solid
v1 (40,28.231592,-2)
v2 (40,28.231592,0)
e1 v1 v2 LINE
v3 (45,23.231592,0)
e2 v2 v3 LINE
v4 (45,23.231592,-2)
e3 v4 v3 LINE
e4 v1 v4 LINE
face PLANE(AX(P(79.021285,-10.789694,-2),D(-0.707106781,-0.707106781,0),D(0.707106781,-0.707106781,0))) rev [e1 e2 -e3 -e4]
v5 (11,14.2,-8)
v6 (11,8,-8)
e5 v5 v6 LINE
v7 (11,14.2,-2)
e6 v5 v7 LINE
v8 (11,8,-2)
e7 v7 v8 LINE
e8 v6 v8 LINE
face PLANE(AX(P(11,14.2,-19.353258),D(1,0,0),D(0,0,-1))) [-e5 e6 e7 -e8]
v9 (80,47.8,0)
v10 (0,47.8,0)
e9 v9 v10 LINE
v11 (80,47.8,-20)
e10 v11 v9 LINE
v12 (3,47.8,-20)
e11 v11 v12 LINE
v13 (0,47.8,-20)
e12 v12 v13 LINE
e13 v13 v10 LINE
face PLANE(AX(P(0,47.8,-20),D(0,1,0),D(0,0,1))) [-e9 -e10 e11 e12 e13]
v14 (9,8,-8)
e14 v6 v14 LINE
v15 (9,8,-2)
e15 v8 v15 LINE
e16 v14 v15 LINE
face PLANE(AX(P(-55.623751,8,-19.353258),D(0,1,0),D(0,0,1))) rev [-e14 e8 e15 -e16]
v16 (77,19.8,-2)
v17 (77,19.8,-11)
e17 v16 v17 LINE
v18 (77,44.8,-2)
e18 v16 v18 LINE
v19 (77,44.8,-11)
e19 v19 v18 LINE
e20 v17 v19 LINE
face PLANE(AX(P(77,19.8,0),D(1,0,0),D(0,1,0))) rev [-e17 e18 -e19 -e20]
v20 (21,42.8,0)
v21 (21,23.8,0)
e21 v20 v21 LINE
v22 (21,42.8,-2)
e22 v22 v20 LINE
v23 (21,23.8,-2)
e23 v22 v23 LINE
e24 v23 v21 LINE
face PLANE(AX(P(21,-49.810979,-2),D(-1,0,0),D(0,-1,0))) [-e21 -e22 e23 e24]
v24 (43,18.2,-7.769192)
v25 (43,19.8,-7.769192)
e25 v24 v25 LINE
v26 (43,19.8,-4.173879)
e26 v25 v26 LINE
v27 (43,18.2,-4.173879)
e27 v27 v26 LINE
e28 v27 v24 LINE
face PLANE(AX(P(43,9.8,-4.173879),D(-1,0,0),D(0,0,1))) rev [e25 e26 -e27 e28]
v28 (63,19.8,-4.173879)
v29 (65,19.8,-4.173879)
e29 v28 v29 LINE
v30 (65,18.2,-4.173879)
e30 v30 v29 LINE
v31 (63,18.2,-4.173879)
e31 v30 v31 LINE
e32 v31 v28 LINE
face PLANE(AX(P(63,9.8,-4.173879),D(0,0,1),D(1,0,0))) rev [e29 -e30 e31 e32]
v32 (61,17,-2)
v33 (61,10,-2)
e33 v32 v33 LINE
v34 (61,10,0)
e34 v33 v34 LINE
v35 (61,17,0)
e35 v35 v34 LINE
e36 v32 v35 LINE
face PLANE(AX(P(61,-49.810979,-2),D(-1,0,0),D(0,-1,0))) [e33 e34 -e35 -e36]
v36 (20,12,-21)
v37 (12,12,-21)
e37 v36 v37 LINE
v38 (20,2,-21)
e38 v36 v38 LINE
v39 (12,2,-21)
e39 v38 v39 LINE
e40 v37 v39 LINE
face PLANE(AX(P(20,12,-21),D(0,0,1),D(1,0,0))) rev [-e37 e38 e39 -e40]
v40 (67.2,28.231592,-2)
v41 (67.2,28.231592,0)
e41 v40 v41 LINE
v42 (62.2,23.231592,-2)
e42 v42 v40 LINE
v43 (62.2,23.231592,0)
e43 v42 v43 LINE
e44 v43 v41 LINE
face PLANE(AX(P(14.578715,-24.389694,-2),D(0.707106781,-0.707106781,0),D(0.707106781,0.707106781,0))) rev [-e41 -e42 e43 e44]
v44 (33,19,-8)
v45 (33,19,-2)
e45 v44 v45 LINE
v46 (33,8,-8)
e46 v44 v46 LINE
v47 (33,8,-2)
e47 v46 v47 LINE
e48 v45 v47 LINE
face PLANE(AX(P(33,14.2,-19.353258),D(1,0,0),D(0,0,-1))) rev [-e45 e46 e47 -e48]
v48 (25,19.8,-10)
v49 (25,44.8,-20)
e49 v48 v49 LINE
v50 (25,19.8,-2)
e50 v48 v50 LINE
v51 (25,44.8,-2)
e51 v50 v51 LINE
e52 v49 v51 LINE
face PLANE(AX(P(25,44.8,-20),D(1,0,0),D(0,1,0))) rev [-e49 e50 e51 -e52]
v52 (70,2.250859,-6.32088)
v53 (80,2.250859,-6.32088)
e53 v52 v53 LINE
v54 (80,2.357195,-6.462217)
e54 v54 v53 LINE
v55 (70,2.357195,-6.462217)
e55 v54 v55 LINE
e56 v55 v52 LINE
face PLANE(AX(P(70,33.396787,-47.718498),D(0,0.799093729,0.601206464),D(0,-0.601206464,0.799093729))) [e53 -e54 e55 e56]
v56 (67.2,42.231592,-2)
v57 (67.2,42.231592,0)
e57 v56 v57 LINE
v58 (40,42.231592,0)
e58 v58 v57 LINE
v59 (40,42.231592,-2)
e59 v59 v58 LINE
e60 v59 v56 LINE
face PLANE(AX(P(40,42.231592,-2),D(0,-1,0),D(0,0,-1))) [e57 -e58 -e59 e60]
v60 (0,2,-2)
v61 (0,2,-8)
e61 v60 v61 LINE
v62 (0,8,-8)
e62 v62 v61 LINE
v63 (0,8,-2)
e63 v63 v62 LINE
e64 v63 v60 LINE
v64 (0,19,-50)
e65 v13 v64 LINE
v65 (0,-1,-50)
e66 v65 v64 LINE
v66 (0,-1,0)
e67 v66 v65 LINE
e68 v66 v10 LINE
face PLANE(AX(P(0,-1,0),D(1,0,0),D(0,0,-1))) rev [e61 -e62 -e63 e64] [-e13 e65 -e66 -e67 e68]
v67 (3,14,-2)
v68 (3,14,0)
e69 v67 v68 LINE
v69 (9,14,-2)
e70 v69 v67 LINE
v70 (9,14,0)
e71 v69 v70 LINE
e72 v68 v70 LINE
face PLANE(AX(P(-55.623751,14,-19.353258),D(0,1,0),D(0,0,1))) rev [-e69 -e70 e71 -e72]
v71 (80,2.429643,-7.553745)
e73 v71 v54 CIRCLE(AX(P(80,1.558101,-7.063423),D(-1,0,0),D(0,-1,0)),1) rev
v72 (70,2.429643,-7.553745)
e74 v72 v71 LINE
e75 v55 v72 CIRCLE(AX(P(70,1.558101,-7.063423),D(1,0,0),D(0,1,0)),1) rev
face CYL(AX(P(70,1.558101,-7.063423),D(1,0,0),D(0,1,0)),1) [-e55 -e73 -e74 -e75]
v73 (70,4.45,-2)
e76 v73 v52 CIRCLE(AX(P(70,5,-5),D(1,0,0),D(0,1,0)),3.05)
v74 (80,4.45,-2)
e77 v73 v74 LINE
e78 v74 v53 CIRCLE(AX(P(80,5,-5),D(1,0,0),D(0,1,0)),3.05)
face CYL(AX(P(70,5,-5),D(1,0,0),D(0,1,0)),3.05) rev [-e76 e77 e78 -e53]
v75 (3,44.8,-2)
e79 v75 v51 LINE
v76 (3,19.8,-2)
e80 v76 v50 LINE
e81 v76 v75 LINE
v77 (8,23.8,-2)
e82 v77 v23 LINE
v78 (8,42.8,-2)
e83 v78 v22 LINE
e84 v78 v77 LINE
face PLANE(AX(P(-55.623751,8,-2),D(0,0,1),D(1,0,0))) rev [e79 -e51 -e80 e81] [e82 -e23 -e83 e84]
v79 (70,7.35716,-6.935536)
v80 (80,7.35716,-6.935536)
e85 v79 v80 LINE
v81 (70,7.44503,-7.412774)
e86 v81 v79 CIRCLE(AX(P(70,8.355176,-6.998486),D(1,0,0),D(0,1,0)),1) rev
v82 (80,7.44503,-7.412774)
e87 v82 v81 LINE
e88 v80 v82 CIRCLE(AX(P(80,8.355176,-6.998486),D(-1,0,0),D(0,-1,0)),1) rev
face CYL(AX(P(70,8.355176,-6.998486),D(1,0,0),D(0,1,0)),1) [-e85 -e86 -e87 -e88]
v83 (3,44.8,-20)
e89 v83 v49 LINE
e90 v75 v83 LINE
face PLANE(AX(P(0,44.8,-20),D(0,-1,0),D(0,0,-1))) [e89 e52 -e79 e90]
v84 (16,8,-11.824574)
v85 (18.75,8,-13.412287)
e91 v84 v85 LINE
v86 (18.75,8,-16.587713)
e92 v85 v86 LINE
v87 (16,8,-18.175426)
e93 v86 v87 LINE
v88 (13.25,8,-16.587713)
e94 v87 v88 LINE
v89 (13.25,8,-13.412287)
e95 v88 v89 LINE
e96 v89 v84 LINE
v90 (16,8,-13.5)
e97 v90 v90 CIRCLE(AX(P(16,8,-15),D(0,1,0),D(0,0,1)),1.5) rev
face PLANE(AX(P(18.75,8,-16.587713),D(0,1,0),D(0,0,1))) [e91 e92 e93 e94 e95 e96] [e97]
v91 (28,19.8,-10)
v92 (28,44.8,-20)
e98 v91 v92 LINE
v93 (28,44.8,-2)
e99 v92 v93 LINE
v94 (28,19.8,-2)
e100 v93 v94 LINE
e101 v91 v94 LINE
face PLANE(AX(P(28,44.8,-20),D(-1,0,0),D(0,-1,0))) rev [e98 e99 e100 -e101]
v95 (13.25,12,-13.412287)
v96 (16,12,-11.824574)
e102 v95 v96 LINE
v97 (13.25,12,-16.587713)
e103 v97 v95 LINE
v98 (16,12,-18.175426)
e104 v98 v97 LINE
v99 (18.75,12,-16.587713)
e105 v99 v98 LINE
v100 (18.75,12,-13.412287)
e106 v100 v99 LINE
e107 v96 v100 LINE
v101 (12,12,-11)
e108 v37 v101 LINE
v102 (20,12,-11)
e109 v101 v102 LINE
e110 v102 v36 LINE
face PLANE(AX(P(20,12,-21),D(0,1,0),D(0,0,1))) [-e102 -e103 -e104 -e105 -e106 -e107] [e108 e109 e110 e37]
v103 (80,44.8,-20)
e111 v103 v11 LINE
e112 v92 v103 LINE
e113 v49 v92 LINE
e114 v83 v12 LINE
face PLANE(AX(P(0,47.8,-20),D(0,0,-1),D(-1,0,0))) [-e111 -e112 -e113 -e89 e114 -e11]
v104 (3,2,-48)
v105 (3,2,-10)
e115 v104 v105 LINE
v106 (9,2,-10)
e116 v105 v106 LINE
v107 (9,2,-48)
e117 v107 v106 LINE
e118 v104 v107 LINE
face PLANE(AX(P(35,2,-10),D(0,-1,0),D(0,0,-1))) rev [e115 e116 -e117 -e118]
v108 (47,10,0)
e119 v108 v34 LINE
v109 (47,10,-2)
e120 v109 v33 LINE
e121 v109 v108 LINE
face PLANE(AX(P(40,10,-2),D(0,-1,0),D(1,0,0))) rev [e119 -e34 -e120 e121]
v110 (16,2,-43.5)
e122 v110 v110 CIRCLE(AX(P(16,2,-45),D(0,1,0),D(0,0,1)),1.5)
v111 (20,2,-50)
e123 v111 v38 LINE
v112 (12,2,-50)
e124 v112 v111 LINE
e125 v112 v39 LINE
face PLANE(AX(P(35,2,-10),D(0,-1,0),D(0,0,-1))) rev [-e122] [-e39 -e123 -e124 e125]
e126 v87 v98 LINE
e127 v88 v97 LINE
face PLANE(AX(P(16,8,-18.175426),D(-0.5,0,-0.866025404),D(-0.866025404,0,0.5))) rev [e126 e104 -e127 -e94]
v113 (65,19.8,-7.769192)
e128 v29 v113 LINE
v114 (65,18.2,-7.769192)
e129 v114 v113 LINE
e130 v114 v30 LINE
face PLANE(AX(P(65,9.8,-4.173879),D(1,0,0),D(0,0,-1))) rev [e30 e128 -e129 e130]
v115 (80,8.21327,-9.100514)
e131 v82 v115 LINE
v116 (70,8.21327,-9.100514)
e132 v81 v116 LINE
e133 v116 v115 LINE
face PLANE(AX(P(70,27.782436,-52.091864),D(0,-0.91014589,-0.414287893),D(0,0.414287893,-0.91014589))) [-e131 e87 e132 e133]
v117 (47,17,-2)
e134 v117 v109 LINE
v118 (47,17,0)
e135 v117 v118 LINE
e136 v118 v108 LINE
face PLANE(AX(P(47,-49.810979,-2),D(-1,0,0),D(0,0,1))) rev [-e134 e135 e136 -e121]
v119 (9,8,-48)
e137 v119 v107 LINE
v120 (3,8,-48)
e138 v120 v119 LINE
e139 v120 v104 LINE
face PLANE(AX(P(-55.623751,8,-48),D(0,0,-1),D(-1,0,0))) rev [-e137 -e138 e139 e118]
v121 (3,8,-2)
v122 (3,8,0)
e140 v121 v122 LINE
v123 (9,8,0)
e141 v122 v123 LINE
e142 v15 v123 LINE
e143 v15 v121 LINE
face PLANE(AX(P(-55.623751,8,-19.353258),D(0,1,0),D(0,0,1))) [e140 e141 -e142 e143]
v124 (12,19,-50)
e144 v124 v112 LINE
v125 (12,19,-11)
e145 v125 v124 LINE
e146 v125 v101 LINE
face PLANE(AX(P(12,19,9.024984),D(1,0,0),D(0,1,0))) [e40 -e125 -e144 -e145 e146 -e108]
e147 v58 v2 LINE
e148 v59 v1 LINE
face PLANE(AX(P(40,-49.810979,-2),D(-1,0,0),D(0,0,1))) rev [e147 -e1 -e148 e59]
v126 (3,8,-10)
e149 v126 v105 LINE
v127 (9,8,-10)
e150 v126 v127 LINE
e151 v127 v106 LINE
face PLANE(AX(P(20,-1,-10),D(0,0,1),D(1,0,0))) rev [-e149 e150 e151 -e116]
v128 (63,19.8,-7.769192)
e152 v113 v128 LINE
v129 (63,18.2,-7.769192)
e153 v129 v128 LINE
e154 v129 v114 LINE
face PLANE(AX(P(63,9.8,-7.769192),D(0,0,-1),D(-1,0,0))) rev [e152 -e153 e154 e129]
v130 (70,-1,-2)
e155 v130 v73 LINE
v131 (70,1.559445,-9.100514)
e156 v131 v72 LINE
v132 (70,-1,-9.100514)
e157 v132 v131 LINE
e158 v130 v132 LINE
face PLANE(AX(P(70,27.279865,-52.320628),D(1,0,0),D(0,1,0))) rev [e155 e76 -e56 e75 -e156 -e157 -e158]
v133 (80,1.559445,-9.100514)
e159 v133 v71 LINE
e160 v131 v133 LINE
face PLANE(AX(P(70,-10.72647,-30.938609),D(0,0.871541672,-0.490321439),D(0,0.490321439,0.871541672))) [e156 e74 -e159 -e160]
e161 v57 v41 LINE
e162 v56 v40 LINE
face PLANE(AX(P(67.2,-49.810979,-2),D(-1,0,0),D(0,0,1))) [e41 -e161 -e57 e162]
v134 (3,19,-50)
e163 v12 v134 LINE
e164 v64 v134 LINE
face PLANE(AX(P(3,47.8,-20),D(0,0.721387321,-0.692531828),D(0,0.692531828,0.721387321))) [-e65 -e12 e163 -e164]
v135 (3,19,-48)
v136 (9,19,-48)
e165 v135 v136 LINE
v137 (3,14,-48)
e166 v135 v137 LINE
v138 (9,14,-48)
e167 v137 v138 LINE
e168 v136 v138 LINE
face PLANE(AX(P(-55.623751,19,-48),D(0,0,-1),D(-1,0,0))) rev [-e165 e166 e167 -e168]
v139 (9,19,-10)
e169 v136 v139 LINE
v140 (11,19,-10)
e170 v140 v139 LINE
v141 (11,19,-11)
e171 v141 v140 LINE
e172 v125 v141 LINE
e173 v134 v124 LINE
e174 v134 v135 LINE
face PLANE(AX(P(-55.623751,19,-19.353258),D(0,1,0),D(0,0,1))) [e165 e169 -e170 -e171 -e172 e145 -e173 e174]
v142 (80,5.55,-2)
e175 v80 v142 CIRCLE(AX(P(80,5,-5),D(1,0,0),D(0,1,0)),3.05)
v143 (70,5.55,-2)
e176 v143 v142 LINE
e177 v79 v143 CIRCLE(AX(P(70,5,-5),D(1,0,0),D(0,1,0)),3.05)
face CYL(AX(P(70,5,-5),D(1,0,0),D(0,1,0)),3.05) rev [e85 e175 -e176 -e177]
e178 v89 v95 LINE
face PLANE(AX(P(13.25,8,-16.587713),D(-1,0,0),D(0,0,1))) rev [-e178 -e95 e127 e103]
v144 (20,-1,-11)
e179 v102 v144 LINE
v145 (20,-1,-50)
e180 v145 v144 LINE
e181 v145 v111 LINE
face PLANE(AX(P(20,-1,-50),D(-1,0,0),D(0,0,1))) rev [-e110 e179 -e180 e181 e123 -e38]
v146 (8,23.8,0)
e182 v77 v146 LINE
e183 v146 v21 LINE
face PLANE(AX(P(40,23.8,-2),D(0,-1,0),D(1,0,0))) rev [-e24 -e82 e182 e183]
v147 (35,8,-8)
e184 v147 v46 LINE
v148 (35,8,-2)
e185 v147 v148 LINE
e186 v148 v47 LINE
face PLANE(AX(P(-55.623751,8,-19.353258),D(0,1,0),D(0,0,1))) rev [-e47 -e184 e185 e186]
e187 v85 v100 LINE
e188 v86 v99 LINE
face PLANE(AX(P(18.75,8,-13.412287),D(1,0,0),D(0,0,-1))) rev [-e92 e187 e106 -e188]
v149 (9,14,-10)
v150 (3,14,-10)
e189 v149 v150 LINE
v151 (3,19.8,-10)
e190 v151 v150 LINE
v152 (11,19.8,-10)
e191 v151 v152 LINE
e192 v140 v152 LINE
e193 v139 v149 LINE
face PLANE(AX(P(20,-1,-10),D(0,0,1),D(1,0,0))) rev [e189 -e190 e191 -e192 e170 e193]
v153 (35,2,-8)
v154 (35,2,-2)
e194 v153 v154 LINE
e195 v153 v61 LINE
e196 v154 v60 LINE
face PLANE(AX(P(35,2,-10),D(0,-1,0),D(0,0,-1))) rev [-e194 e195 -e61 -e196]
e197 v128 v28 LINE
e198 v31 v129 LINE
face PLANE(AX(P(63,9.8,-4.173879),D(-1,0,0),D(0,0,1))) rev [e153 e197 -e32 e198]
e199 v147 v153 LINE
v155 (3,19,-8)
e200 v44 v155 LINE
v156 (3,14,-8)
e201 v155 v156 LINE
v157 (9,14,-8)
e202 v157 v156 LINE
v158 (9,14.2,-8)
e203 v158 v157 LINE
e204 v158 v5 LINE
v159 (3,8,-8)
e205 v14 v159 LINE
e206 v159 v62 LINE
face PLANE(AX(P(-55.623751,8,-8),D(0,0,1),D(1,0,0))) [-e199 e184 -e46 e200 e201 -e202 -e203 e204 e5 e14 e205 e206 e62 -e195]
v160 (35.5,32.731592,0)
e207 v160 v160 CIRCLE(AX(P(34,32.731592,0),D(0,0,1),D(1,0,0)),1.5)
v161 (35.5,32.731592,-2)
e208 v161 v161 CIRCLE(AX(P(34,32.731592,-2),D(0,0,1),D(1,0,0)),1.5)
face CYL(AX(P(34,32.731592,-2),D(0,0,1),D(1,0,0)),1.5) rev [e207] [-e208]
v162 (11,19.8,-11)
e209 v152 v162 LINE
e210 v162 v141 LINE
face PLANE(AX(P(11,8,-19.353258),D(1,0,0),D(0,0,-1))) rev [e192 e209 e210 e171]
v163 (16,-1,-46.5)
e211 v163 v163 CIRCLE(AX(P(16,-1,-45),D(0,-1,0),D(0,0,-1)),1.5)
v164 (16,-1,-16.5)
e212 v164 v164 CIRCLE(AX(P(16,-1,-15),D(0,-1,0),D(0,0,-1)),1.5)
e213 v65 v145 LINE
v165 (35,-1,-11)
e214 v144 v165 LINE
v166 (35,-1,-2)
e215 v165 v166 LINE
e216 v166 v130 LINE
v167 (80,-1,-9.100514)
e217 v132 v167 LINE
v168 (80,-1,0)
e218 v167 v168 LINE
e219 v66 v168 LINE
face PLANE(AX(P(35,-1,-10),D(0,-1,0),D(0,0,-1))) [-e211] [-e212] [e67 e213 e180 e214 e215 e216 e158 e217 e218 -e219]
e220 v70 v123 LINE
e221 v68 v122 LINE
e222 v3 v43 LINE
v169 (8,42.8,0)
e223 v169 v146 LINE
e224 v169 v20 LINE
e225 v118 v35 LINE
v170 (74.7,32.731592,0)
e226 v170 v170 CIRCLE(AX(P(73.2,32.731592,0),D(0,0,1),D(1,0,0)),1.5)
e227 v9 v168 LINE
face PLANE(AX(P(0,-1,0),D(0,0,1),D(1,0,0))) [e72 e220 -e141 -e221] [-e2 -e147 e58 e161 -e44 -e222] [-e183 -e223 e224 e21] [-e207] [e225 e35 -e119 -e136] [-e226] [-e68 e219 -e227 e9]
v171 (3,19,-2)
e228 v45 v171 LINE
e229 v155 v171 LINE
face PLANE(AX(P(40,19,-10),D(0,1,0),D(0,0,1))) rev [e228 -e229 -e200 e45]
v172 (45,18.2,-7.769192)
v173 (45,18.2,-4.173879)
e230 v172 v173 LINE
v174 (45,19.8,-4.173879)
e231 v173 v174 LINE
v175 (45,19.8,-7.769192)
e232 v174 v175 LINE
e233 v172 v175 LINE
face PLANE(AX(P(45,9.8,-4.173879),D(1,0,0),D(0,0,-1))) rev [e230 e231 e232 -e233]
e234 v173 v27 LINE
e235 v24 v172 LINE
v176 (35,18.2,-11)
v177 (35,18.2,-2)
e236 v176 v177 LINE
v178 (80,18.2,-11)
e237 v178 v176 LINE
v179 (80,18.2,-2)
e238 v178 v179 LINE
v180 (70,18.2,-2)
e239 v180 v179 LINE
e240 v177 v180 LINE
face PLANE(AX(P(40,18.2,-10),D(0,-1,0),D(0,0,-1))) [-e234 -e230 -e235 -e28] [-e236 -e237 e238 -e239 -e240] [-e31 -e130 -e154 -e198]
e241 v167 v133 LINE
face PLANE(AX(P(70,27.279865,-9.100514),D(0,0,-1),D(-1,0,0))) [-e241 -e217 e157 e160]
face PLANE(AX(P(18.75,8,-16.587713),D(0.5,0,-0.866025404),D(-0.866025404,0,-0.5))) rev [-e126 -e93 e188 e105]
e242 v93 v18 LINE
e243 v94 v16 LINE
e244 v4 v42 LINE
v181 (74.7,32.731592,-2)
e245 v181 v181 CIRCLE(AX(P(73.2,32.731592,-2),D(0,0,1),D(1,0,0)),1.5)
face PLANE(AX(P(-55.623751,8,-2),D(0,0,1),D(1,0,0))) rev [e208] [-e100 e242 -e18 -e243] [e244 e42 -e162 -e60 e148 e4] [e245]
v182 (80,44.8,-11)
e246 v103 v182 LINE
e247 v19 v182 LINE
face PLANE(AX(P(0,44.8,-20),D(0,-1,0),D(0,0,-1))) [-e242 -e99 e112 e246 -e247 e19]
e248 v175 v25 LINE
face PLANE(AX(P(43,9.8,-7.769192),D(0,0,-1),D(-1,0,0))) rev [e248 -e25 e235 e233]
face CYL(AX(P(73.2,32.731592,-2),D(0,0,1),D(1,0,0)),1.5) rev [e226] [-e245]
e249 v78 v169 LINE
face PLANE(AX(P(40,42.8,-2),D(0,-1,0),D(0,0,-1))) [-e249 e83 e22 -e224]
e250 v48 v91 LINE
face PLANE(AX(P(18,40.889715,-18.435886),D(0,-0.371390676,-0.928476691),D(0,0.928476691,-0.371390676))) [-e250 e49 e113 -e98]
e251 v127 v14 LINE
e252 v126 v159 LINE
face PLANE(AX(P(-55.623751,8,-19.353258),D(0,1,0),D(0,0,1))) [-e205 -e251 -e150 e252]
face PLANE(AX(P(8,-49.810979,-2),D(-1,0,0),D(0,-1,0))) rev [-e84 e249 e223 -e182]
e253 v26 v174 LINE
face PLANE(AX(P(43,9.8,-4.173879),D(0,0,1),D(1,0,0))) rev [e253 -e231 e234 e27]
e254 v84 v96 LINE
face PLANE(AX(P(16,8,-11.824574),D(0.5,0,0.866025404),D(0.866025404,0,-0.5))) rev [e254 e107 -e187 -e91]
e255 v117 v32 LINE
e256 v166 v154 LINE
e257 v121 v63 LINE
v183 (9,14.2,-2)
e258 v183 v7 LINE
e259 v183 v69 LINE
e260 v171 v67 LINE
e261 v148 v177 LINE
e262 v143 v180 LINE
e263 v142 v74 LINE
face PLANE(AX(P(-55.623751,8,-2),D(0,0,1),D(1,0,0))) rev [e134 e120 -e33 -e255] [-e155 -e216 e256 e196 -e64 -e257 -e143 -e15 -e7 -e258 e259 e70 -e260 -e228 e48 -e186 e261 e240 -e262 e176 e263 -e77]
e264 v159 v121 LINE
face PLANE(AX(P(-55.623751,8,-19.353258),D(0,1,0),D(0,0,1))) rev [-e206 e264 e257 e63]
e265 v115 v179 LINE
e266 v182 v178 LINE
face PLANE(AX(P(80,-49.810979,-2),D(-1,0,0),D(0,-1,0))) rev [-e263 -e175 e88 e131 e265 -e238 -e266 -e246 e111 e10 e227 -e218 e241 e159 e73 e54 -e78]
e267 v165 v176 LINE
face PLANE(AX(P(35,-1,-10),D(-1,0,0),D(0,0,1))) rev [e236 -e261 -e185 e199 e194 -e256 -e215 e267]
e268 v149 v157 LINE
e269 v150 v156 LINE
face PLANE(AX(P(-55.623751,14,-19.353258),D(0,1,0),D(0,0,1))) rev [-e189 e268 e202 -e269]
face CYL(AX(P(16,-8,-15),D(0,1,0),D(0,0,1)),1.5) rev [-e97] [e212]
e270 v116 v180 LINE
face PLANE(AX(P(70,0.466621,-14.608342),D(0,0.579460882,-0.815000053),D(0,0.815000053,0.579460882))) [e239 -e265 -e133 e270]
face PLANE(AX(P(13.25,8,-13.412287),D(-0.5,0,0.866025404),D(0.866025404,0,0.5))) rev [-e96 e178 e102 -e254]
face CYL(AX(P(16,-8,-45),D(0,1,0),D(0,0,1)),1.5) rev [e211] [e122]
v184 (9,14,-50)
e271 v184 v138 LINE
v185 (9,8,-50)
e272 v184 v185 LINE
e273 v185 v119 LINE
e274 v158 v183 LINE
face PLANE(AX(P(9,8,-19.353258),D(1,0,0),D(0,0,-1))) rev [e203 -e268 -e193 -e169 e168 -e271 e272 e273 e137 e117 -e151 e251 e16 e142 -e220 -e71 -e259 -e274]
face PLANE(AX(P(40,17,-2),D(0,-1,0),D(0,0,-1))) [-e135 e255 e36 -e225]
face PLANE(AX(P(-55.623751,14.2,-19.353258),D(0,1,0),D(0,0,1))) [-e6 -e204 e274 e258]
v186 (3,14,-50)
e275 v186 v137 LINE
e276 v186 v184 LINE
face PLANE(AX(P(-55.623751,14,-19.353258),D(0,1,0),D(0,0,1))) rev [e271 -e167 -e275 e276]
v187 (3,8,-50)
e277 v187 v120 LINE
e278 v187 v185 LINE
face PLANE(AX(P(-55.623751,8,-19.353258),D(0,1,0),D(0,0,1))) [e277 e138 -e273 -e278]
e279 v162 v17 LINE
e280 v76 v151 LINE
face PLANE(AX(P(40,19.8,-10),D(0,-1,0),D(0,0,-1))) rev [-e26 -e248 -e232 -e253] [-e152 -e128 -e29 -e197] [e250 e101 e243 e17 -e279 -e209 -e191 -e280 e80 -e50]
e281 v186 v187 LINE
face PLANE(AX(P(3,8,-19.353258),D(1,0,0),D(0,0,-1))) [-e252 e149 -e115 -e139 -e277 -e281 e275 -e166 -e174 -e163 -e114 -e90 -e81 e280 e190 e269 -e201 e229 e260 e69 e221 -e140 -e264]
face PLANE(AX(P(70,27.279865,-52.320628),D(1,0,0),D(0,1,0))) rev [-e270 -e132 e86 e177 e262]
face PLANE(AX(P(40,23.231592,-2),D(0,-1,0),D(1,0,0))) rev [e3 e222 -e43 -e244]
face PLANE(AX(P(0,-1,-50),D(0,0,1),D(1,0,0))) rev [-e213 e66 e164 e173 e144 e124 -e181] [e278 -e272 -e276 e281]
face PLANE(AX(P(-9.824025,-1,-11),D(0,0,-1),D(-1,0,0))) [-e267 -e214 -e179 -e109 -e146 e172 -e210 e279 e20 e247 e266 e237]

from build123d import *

# Parameters (mm, degrees)
RESSALTO_EXTRUS_O1_DEPTH      = 2
RESSALTO_EXTRUS_O1_DEPTH_BACK = 1
ESBO_O1_3_W                   = 35
ESBO_O1_3_H                   = 2
RESSALTO_EXTRUS_O2_DEPTH      = 8
RESSALTO_EXTRUS_O3_DEPTH      = 8
RESSALTO_EXTRUS_O5_START      = 8
ESBO_O1_5_W                   = 3
ESBO_O1_5_H                   = 50
ESBO_O1_5_W_2                 = 22
ESBO_O1_5_H_2                 = 6
RESSALTO_EXTRUS_O5_DEPTH      = 6.2
RESSALTO_EXTRUS_O6_START      = 14
ESBO_O1_6_W                   = 2
ESBO_O1_6_H                   = 6
ESBO_O1_6_H_2                 = 2
ESBO_O1_6_W_2                 = 22
ESBO_O1_6_W_3                 = 6
ESBO_O1_6_W_4                 = 3
ESBO_O1_6_H_3                 = 38
RESSALTO_EXTRUS_O6_DEPTH      = 5
ESBO_O5_R                     = 1.5
CORTE_EXTRUS_O2_DEPTH         = 10
RESSALTO_EXTRUS_O7_START      = -2
ESBO_O6_W                     = 13
ESBO_O6_H                     = 19
ESBO_O6_R                     = 1.5
ESBO_O6_W_2                   = 14
ESBO_O6_H_2                   = 7
RESSALTO_EXTRUS_O7_DEPTH      = 2
RESSALTO_EXTRUS_O8_START      = -10
ESBO_O6_3_W                   = 45
ESBO_O6_3_H                   = 0.8
RESSALTO_EXTRUS_O8_DEPTH      = 8
ESBO_O7_W                     = 2
ESBO_O7_H                     = 3.59531288
CORTE_EXTRUS_O3_DEPTH         = 10
ESBO_O11_W                    = 80
ESBO_O11_H                    = 3
RESSALTO_EXTRUS_O11_DEPTH     = 20
ESBO_O12_W                    = 3
ESBO_O12_H                    = 25
RESSALTO_EXTRUS_O12_DEPTH     = 18
RESSALTO_EXTRUS_O9_START      = -3
RESSALTO_EXTRUS_O9_DEPTH      = 3
ESBO_O10_W                    = 10
ESBO_O10_H                    = 25
RESSALTO_EXTRUS_O10_DEPTH     = 3
ESBO_O13_W                    = 4.849706681
ESBO_O13_H                    = 25
CORTE_EXTRUS_O4_DEPTH         = 10
RESSALTO_EXTRUS_O13_REACH     = 84.522
ESBO_O14_W                    = 1
ESBO_O14_H                    = 20.8
ESBO_O15_W                    = 1
ESBO_O15_H                    = 20
RESSALTO_EXTRUS_O14_DEPTH     = 39
ESBO_O20_W                    = 8
ESBO_O20_H                    = 10
RESSALTO_EXTRUS_O18_DEPTH     = 10
CORTE_EXTRUS_O6_START         = -10
ESBO_O21_R                    = 1.5
CORTE_EXTRUS_O6_DEPTH         = 10
RESSALTO_EXTRUS_O19_DEPTH     = 1
CORTE_EXTRUS_O7_DEPTH         = 4
RESSALTO_EXTRUS_O20_DEPTH     = 10
FILETE1_R                     = 1


with BuildPart() as part:
    # Esboço1 → Ressalto-extrusão1 (new, two sides: drawn at the far end of the back side and taken through both)
    with BuildSketch(Plane(origin=(0, 0, 0), x_dir=(1, 0, 0), z_dir=(0, 1, 0)).offset(-RESSALTO_EXTRUS_O1_DEPTH_BACK)):
        Polygon((0, 0), (0, 50), (20, 50), (20, 10), (35, 10), (35, 0), align=None)
    extrude(amount=RESSALTO_EXTRUS_O1_DEPTH + RESSALTO_EXTRUS_O1_DEPTH_BACK)

    # Esboço1<3> → Ressalto-extrusão2 (add)
    with BuildSketch(Plane(origin=(0, 0, 0), x_dir=(1, 0, 0), z_dir=(0, 1, 0))):
        with Locations((17.5, 1)):
            Rectangle(ESBO_O1_3_W, ESBO_O1_3_H)
        with Locations((17.5, 9)):
            Rectangle(ESBO_O1_3_W, ESBO_O1_3_H)
    extrude(amount=RESSALTO_EXTRUS_O2_DEPTH)

    # Esboço1<4> → Ressalto-extrusão3 (add)
    with BuildSketch(Plane(origin=(0, 0, 0), x_dir=(1, 0, 0), z_dir=(0, 1, 0))):
        Polygon((0, 10), (3, 10), (3, 48), (9, 48), (9, 10), (11, 10), (11, 50), (0, 50), align=None)
    extrude(amount=RESSALTO_EXTRUS_O3_DEPTH)

    # Esboço1<5> → Ressalto-extrusão5 (add)
    # profile 1 of 2: a face of its own
    with BuildSketch(Plane(origin=(0, 0, 0), x_dir=(1, 0, 0), z_dir=(0, 1, 0)).offset(RESSALTO_EXTRUS_O5_START)):
        with Locations((1.5, 25)):
            Rectangle(ESBO_O1_5_W, ESBO_O1_5_H)
    # profile 2 of 2: a face of its own
    with BuildSketch(Plane(origin=(0, 0, 0), x_dir=(1, 0, 0), z_dir=(0, 1, 0)).offset(RESSALTO_EXTRUS_O5_START)):
        Polygon((35, 0), (35, 10), (11, 10), (11, 50), (9, 50), (9, 0), align=None)
        with Locations((22, 5)):
            Rectangle(ESBO_O1_5_W_2, ESBO_O1_5_H_2, mode=Mode.SUBTRACT)
    extrude(amount=RESSALTO_EXTRUS_O5_DEPTH)

    # Esboço1<6> → Ressalto-extrusão6 (add)
    with BuildSketch(Plane(origin=(0, 0, 0), x_dir=(1, 0, 0), z_dir=(0, 1, 0)).offset(RESSALTO_EXTRUS_O6_START)):
        with Locations((34, 5)):
            Rectangle(ESBO_O1_6_W, ESBO_O1_6_H)
        with Locations((34, 1)):
            Rectangle(ESBO_O1_6_W, ESBO_O1_6_H_2)
        with Locations((22, 1)):
            Rectangle(ESBO_O1_6_W_2, ESBO_O1_6_H_2)
        with Locations((34, 9)):
            Rectangle(ESBO_O1_6_W, ESBO_O1_6_H_2)
        Polygon((11, 10), (11, 8), (33, 8), (33, 10), (20, 10), align=None)
        with Locations((10, 1)):
            Rectangle(ESBO_O1_6_W, ESBO_O1_6_H_2)
        with Locations((6, 1)):
            Rectangle(ESBO_O1_6_W_3, ESBO_O1_6_H_2)
        with Locations((1.5, 1)):
            Rectangle(ESBO_O1_6_W_4, ESBO_O1_6_H_2)
        with Locations((1.5, 5)):
            Rectangle(ESBO_O1_6_W_4, ESBO_O1_6_H)
        with Locations((1.5, 9)):
            Rectangle(ESBO_O1_6_W_4, ESBO_O1_6_H_2)
        with Locations((1.5, 29)):
            Rectangle(ESBO_O1_6_W_4, ESBO_O1_6_H_3)
        with Locations((1.5, 49)):
            Rectangle(ESBO_O1_6_W_4, ESBO_O1_6_H_2)
        with Locations((6, 9)):
            Rectangle(ESBO_O1_6_W_3, ESBO_O1_6_H_2)
        with Locations((10, 9)):
            Rectangle(ESBO_O1_6_W, ESBO_O1_6_H_2)
        with Locations((6, 49)):
            Rectangle(ESBO_O1_6_W_3, ESBO_O1_6_H_2)
        with Locations((10, 49)):
            Rectangle(ESBO_O1_6_W, ESBO_O1_6_H_2)
        with Locations((10, 29)):
            Rectangle(ESBO_O1_6_W, ESBO_O1_6_H_3)
    extrude(amount=RESSALTO_EXTRUS_O6_DEPTH)

    # Esboço5 → Corte-extrusão2 (cut)
    with BuildSketch(Plane(origin=(0, 2, 0), x_dir=(1, 0, 0), z_dir=(0, 1, 0))):
        with Locations(Location((16, 15, 0), (0, 0, 270))):
            Circle(ESBO_O5_R)
        with Locations(Location((16, 45, 0), (0, 0, 270))):
            Circle(ESBO_O5_R)
    extrude(amount=-CORTE_EXTRUS_O2_DEPTH, mode=Mode.SUBTRACT)

    # Esboço6 → Ressalto-extrusão7 (add)
    with BuildSketch(Plane.XY.offset(RESSALTO_EXTRUS_O7_START)):
        Polygon((80, 44.8), (0, 44.8), (0, 19), (35, 19), (35, -1), (80, -1), align=None)
        with Locations((14.5, 33.3)):
            Rectangle(ESBO_O6_W, ESBO_O6_H, mode=Mode.SUBTRACT)
        with Locations((34, 32.731591612)):
            Circle(ESBO_O6_R, mode=Mode.SUBTRACT)
        Polygon((45, 23.231591612), (40, 28.231591612), (40, 42.231591612), (67.2, 42.231591612), (67.2, 28.231591612), (62.2, 23.231591612), align=None, mode=Mode.SUBTRACT)
        with Locations((73.2, 32.731591612)):
            Circle(ESBO_O6_R, mode=Mode.SUBTRACT)
        with Locations((54, 13.5)):
            Rectangle(ESBO_O6_W_2, ESBO_O6_H_2, mode=Mode.SUBTRACT)
    extrude(amount=RESSALTO_EXTRUS_O7_DEPTH)

    # Esboço6<3> → Ressalto-extrusão8 (add)
    with BuildSketch(Plane.XY.offset(RESSALTO_EXTRUS_O8_START)):
        Polygon((80, 19.8), (0, 19.8), (0, 19), (35, 19), (80, 19), align=None)
        with Locations((57.5, 18.6)):
            Rectangle(ESBO_O6_3_W, ESBO_O6_3_H)
    extrude(amount=RESSALTO_EXTRUS_O8_DEPTH)

    # Esboço7 → Corte-extrusão3 (cut)
    with BuildSketch(Plane(origin=(0, 19.8, 0), x_dir=(1, 0, 0), z_dir=(0, 1, 0))):
        with Locations((44, 5.971535205)):
            Rectangle(ESBO_O7_W, ESBO_O7_H)
        with Locations((64, 5.971535205)):
            Rectangle(ESBO_O7_W, ESBO_O7_H)
    extrude(amount=-CORTE_EXTRUS_O3_DEPTH, mode=Mode.SUBTRACT)

    # Esboço11 → Ressalto-extrusão11 (add)
    with BuildSketch(Plane.XY):
        with Locations((40, 46.3)):
            Rectangle(ESBO_O11_W, ESBO_O11_H)
    extrude(amount=-RESSALTO_EXTRUS_O11_DEPTH)

    # Esboço12 → Ressalto-extrusão12 (add)
    with BuildSketch(Plane(origin=(0, 0, -2), x_dir=(-1, 0, 0), z_dir=(0, 0, -1))):
        with Locations((-26.5, 32.3)):
            Rectangle(ESBO_O12_W, ESBO_O12_H)
    extrude(amount=RESSALTO_EXTRUS_O12_DEPTH)

    # Esboço9 → Ressalto-extrusão9 (add)
    with BuildSketch(Plane.ZY.offset(RESSALTO_EXTRUS_O9_START)):
        Polygon((-20, 47.8), (-50, 19), (-2, 19), (-2, 47.8), align=None)
    extrude(amount=RESSALTO_EXTRUS_O9_DEPTH)

    # Esboço10 → Ressalto-extrusão10 (add)
    with BuildSketch(Plane(origin=(80, 0, 0), x_dir=(0, 0, -1), z_dir=(1, 0, 0))):
        with Locations((5, 32.3)):
            Rectangle(ESBO_O10_W, ESBO_O10_H)
    extrude(amount=-RESSALTO_EXTRUS_O10_DEPTH)

    # Esboço13 → Corte-extrusão4 (cut)
    with BuildSketch(Plane(origin=(28, 0, 0), x_dir=(0, 0, -1), z_dir=(1, 0, 0))):
        with Locations((22.424853341, 32.3)):
            Rectangle(ESBO_O13_W, ESBO_O13_H)
        Polygon((10, 19.8), (20, 44.8), (20, 19.8), align=None)
    extrude(amount=-CORTE_EXTRUS_O4_DEPTH, mode=Mode.SUBTRACT)

    # Ressalto-extrusão13: up to this face of the body (flat: up to its plane)
    ressalto_extrus_o13_end = Plane(part.part.faces().sort_by_distance((11, 10.5, -30))[0])
    # Esboço14 → Ressalto-extrusão13 (add, up to the picked face)
    with BuildSketch(Plane(origin=(35, 0, 0), x_dir=(0, 0, -1), z_dir=(1, 0, 0)), mode=Mode.PRIVATE) as ressalto_extrus_o13_sk1:
        with Locations((10.5, 9.4)):
            Rectangle(ESBO_O14_W, ESBO_O14_H)
    ressalto_extrus_o13_tool1 = split(extrude(ressalto_extrus_o13_sk1.sketch, amount=-RESSALTO_EXTRUS_O13_REACH, mode=Mode.PRIVATE), bisect_by=ressalto_extrus_o13_end, keep=Keep.BOTH, mode=Mode.PRIVATE)
    add(ressalto_extrus_o13_tool1.solids().sort_by(Axis((35, 9.4, -10.5), (-1, 0, 0)))[0])

    # Esboço15 → Ressalto-extrusão14 (add)
    with BuildSketch(Plane(origin=(0, 0, -50), x_dir=(-1, 0, 0), z_dir=(0, 0, -1))):
        with Locations((-11.5, 9)):
            Rectangle(ESBO_O15_W, ESBO_O15_H)
    extrude(amount=-RESSALTO_EXTRUS_O14_DEPTH)

    # Esboço20 → Ressalto-extrusão18 (add)
    with BuildSketch(Plane(origin=(0, 2, 0), x_dir=(1, 0, 0), z_dir=(0, 1, 0))):
        with Locations((16, 16)):
            Rectangle(ESBO_O20_W, ESBO_O20_H)
    extrude(amount=RESSALTO_EXTRUS_O18_DEPTH)

    # Esboço21 → Corte-extrusão6 (cut)
    with BuildSketch(Plane.XZ.offset(-2).offset(CORTE_EXTRUS_O6_START)):
        with Locations(Location((16, -15, 0), (0, 0, 270))):
            Circle(ESBO_O21_R)
    extrude(amount=CORTE_EXTRUS_O6_DEPTH, mode=Mode.SUBTRACT)

    # Esboço22 → Ressalto-extrusão19 (add)
    with BuildSketch(Plane(origin=(0, 0, -10), x_dir=(-1, 0, 0), z_dir=(0, 0, -1))):
        Polygon((-35, 18.2), (-35, 19.8), (-77, 19.8), (-77, 44.8), (-80, 44.8), (-80, 18.2), align=None)
    extrude(amount=RESSALTO_EXTRUS_O19_DEPTH)

    # Esboço23 → Corte-extrusão7 (cut)
    with BuildSketch(Plane(origin=(0, 12, 0), x_dir=(1, 0, 0), z_dir=(0, 1, 0))):
        Polygon((18.75, 16.58771324), (16, 18.175426481), (13.25, 16.58771324), (13.25, 13.41228676), (16, 11.824573519), (18.75, 13.41228676), align=None)
        Polygon((18.75, 43.41228676), (18.75, 46.58771324), (16, 48.175426481), (13.25, 46.58771324), (13.25, 43.41228676), (16, 41.824573519), align=None)
    extrude(amount=-CORTE_EXTRUS_O7_DEPTH, mode=Mode.SUBTRACT)

    # Esboço24 → Ressalto-extrusão20 (add)
    with BuildSketch(Plane(origin=(80, 0, 0), x_dir=(0, 0, -1), z_dir=(1, 0, 0))):
        with BuildLine():
            Line((9.100514075, 8.213270058), (2, 18.2))
            Line((2, 18.2), (2, 5.55))
            ThreePointArc((2, 5.55), (3.951321001, 7.864048246), (6.935535628, 7.357159696))
            Line((6.935535628, 7.357159696), (6.984313483, 7.25))
            Line((6.984313483, 7.25), (9.100514075, 8.213270058))
        make_face()
        with BuildLine():
            Line((2, 4.45), (2, -1))
            Line((2, -1), (9.100514075, -1))
            Line((9.100514075, -1), (9.100514075, 1.559444743))
            Line((9.100514075, 1.559444743), (6.984313483, 2.75))
            Line((6.984313483, 2.75), (6.320880397, 2.25085923))
            ThreePointArc((6.320880397, 2.25085923), (3.616556582, 2.281804954), (2, 4.45))
        make_face()
    extrude(amount=-RESSALTO_EXTRUS_O20_DEPTH)

    # Filete1
    # the kernel refuses this fillet: 1 mm, written as the material it takes off along each edge
    with BuildSketch(Plane(origin=(81.633402331, 2.75, -6.984313483), x_dir=(0, -0.4903214392898115, -0.8715416720804391), z_dir=(-1, 0, 0))) as filete1_piece_1:
        with BuildLine():
            CenterArc((FILETE1_R * 0.653360932246, FILETE1_R), FILETE1_R, 203.681935757, 66.318064243)
            Line((-FILETE1_R * 0.262428341882, FILETE1_R * 0.598340933885), (-FILETE1_R * 0.280744127364, FILETE1_R * 0.590307752563))
            Line((-FILETE1_R * 0.280744127364, FILETE1_R * 0.590307752563), (-FILETE1_R * 0.0130672186449, -FILETE1_R * 0.02))
            Line((-FILETE1_R * 0.0130672186449, -FILETE1_R * 0.02), (FILETE1_R * 0.653360932246, -FILETE1_R * 0.02))
            Line((FILETE1_R * 0.653360932246, -FILETE1_R * 0.02), (FILETE1_R * 0.653360932246, 0))
        make_face()
    extrude(amount=13.266804661, mode=Mode.SUBTRACT)
    with BuildSketch(Plane(origin=(81.176901612, 7.25, -6.984313483), x_dir=(0, 0.910145890185138, 0.4142878933532846), z_dir=(-1, 0, 0))) as filete1_piece_2:
        with BuildLine():
            CenterArc((1, 0.470760645), FILETE1_R, 180, 28.083682979)
            Line((0, 0.470760645), (-0.02, 0.470760645))
            Line((-0.02, 0.470760645), (-0.02, 0))
            Line((-0.02, 0), (0, -0.02))
            ThreePointArc((0, -0.02), (0.058869516, -0.02), (0.100093813, -0.009415213))
            Line((0.100093813, -0.009415213), (0.117739032, 0))
        make_face()
    extrude(amount=12.353803225, mode=Mode.SUBTRACT)


solid = part.part
